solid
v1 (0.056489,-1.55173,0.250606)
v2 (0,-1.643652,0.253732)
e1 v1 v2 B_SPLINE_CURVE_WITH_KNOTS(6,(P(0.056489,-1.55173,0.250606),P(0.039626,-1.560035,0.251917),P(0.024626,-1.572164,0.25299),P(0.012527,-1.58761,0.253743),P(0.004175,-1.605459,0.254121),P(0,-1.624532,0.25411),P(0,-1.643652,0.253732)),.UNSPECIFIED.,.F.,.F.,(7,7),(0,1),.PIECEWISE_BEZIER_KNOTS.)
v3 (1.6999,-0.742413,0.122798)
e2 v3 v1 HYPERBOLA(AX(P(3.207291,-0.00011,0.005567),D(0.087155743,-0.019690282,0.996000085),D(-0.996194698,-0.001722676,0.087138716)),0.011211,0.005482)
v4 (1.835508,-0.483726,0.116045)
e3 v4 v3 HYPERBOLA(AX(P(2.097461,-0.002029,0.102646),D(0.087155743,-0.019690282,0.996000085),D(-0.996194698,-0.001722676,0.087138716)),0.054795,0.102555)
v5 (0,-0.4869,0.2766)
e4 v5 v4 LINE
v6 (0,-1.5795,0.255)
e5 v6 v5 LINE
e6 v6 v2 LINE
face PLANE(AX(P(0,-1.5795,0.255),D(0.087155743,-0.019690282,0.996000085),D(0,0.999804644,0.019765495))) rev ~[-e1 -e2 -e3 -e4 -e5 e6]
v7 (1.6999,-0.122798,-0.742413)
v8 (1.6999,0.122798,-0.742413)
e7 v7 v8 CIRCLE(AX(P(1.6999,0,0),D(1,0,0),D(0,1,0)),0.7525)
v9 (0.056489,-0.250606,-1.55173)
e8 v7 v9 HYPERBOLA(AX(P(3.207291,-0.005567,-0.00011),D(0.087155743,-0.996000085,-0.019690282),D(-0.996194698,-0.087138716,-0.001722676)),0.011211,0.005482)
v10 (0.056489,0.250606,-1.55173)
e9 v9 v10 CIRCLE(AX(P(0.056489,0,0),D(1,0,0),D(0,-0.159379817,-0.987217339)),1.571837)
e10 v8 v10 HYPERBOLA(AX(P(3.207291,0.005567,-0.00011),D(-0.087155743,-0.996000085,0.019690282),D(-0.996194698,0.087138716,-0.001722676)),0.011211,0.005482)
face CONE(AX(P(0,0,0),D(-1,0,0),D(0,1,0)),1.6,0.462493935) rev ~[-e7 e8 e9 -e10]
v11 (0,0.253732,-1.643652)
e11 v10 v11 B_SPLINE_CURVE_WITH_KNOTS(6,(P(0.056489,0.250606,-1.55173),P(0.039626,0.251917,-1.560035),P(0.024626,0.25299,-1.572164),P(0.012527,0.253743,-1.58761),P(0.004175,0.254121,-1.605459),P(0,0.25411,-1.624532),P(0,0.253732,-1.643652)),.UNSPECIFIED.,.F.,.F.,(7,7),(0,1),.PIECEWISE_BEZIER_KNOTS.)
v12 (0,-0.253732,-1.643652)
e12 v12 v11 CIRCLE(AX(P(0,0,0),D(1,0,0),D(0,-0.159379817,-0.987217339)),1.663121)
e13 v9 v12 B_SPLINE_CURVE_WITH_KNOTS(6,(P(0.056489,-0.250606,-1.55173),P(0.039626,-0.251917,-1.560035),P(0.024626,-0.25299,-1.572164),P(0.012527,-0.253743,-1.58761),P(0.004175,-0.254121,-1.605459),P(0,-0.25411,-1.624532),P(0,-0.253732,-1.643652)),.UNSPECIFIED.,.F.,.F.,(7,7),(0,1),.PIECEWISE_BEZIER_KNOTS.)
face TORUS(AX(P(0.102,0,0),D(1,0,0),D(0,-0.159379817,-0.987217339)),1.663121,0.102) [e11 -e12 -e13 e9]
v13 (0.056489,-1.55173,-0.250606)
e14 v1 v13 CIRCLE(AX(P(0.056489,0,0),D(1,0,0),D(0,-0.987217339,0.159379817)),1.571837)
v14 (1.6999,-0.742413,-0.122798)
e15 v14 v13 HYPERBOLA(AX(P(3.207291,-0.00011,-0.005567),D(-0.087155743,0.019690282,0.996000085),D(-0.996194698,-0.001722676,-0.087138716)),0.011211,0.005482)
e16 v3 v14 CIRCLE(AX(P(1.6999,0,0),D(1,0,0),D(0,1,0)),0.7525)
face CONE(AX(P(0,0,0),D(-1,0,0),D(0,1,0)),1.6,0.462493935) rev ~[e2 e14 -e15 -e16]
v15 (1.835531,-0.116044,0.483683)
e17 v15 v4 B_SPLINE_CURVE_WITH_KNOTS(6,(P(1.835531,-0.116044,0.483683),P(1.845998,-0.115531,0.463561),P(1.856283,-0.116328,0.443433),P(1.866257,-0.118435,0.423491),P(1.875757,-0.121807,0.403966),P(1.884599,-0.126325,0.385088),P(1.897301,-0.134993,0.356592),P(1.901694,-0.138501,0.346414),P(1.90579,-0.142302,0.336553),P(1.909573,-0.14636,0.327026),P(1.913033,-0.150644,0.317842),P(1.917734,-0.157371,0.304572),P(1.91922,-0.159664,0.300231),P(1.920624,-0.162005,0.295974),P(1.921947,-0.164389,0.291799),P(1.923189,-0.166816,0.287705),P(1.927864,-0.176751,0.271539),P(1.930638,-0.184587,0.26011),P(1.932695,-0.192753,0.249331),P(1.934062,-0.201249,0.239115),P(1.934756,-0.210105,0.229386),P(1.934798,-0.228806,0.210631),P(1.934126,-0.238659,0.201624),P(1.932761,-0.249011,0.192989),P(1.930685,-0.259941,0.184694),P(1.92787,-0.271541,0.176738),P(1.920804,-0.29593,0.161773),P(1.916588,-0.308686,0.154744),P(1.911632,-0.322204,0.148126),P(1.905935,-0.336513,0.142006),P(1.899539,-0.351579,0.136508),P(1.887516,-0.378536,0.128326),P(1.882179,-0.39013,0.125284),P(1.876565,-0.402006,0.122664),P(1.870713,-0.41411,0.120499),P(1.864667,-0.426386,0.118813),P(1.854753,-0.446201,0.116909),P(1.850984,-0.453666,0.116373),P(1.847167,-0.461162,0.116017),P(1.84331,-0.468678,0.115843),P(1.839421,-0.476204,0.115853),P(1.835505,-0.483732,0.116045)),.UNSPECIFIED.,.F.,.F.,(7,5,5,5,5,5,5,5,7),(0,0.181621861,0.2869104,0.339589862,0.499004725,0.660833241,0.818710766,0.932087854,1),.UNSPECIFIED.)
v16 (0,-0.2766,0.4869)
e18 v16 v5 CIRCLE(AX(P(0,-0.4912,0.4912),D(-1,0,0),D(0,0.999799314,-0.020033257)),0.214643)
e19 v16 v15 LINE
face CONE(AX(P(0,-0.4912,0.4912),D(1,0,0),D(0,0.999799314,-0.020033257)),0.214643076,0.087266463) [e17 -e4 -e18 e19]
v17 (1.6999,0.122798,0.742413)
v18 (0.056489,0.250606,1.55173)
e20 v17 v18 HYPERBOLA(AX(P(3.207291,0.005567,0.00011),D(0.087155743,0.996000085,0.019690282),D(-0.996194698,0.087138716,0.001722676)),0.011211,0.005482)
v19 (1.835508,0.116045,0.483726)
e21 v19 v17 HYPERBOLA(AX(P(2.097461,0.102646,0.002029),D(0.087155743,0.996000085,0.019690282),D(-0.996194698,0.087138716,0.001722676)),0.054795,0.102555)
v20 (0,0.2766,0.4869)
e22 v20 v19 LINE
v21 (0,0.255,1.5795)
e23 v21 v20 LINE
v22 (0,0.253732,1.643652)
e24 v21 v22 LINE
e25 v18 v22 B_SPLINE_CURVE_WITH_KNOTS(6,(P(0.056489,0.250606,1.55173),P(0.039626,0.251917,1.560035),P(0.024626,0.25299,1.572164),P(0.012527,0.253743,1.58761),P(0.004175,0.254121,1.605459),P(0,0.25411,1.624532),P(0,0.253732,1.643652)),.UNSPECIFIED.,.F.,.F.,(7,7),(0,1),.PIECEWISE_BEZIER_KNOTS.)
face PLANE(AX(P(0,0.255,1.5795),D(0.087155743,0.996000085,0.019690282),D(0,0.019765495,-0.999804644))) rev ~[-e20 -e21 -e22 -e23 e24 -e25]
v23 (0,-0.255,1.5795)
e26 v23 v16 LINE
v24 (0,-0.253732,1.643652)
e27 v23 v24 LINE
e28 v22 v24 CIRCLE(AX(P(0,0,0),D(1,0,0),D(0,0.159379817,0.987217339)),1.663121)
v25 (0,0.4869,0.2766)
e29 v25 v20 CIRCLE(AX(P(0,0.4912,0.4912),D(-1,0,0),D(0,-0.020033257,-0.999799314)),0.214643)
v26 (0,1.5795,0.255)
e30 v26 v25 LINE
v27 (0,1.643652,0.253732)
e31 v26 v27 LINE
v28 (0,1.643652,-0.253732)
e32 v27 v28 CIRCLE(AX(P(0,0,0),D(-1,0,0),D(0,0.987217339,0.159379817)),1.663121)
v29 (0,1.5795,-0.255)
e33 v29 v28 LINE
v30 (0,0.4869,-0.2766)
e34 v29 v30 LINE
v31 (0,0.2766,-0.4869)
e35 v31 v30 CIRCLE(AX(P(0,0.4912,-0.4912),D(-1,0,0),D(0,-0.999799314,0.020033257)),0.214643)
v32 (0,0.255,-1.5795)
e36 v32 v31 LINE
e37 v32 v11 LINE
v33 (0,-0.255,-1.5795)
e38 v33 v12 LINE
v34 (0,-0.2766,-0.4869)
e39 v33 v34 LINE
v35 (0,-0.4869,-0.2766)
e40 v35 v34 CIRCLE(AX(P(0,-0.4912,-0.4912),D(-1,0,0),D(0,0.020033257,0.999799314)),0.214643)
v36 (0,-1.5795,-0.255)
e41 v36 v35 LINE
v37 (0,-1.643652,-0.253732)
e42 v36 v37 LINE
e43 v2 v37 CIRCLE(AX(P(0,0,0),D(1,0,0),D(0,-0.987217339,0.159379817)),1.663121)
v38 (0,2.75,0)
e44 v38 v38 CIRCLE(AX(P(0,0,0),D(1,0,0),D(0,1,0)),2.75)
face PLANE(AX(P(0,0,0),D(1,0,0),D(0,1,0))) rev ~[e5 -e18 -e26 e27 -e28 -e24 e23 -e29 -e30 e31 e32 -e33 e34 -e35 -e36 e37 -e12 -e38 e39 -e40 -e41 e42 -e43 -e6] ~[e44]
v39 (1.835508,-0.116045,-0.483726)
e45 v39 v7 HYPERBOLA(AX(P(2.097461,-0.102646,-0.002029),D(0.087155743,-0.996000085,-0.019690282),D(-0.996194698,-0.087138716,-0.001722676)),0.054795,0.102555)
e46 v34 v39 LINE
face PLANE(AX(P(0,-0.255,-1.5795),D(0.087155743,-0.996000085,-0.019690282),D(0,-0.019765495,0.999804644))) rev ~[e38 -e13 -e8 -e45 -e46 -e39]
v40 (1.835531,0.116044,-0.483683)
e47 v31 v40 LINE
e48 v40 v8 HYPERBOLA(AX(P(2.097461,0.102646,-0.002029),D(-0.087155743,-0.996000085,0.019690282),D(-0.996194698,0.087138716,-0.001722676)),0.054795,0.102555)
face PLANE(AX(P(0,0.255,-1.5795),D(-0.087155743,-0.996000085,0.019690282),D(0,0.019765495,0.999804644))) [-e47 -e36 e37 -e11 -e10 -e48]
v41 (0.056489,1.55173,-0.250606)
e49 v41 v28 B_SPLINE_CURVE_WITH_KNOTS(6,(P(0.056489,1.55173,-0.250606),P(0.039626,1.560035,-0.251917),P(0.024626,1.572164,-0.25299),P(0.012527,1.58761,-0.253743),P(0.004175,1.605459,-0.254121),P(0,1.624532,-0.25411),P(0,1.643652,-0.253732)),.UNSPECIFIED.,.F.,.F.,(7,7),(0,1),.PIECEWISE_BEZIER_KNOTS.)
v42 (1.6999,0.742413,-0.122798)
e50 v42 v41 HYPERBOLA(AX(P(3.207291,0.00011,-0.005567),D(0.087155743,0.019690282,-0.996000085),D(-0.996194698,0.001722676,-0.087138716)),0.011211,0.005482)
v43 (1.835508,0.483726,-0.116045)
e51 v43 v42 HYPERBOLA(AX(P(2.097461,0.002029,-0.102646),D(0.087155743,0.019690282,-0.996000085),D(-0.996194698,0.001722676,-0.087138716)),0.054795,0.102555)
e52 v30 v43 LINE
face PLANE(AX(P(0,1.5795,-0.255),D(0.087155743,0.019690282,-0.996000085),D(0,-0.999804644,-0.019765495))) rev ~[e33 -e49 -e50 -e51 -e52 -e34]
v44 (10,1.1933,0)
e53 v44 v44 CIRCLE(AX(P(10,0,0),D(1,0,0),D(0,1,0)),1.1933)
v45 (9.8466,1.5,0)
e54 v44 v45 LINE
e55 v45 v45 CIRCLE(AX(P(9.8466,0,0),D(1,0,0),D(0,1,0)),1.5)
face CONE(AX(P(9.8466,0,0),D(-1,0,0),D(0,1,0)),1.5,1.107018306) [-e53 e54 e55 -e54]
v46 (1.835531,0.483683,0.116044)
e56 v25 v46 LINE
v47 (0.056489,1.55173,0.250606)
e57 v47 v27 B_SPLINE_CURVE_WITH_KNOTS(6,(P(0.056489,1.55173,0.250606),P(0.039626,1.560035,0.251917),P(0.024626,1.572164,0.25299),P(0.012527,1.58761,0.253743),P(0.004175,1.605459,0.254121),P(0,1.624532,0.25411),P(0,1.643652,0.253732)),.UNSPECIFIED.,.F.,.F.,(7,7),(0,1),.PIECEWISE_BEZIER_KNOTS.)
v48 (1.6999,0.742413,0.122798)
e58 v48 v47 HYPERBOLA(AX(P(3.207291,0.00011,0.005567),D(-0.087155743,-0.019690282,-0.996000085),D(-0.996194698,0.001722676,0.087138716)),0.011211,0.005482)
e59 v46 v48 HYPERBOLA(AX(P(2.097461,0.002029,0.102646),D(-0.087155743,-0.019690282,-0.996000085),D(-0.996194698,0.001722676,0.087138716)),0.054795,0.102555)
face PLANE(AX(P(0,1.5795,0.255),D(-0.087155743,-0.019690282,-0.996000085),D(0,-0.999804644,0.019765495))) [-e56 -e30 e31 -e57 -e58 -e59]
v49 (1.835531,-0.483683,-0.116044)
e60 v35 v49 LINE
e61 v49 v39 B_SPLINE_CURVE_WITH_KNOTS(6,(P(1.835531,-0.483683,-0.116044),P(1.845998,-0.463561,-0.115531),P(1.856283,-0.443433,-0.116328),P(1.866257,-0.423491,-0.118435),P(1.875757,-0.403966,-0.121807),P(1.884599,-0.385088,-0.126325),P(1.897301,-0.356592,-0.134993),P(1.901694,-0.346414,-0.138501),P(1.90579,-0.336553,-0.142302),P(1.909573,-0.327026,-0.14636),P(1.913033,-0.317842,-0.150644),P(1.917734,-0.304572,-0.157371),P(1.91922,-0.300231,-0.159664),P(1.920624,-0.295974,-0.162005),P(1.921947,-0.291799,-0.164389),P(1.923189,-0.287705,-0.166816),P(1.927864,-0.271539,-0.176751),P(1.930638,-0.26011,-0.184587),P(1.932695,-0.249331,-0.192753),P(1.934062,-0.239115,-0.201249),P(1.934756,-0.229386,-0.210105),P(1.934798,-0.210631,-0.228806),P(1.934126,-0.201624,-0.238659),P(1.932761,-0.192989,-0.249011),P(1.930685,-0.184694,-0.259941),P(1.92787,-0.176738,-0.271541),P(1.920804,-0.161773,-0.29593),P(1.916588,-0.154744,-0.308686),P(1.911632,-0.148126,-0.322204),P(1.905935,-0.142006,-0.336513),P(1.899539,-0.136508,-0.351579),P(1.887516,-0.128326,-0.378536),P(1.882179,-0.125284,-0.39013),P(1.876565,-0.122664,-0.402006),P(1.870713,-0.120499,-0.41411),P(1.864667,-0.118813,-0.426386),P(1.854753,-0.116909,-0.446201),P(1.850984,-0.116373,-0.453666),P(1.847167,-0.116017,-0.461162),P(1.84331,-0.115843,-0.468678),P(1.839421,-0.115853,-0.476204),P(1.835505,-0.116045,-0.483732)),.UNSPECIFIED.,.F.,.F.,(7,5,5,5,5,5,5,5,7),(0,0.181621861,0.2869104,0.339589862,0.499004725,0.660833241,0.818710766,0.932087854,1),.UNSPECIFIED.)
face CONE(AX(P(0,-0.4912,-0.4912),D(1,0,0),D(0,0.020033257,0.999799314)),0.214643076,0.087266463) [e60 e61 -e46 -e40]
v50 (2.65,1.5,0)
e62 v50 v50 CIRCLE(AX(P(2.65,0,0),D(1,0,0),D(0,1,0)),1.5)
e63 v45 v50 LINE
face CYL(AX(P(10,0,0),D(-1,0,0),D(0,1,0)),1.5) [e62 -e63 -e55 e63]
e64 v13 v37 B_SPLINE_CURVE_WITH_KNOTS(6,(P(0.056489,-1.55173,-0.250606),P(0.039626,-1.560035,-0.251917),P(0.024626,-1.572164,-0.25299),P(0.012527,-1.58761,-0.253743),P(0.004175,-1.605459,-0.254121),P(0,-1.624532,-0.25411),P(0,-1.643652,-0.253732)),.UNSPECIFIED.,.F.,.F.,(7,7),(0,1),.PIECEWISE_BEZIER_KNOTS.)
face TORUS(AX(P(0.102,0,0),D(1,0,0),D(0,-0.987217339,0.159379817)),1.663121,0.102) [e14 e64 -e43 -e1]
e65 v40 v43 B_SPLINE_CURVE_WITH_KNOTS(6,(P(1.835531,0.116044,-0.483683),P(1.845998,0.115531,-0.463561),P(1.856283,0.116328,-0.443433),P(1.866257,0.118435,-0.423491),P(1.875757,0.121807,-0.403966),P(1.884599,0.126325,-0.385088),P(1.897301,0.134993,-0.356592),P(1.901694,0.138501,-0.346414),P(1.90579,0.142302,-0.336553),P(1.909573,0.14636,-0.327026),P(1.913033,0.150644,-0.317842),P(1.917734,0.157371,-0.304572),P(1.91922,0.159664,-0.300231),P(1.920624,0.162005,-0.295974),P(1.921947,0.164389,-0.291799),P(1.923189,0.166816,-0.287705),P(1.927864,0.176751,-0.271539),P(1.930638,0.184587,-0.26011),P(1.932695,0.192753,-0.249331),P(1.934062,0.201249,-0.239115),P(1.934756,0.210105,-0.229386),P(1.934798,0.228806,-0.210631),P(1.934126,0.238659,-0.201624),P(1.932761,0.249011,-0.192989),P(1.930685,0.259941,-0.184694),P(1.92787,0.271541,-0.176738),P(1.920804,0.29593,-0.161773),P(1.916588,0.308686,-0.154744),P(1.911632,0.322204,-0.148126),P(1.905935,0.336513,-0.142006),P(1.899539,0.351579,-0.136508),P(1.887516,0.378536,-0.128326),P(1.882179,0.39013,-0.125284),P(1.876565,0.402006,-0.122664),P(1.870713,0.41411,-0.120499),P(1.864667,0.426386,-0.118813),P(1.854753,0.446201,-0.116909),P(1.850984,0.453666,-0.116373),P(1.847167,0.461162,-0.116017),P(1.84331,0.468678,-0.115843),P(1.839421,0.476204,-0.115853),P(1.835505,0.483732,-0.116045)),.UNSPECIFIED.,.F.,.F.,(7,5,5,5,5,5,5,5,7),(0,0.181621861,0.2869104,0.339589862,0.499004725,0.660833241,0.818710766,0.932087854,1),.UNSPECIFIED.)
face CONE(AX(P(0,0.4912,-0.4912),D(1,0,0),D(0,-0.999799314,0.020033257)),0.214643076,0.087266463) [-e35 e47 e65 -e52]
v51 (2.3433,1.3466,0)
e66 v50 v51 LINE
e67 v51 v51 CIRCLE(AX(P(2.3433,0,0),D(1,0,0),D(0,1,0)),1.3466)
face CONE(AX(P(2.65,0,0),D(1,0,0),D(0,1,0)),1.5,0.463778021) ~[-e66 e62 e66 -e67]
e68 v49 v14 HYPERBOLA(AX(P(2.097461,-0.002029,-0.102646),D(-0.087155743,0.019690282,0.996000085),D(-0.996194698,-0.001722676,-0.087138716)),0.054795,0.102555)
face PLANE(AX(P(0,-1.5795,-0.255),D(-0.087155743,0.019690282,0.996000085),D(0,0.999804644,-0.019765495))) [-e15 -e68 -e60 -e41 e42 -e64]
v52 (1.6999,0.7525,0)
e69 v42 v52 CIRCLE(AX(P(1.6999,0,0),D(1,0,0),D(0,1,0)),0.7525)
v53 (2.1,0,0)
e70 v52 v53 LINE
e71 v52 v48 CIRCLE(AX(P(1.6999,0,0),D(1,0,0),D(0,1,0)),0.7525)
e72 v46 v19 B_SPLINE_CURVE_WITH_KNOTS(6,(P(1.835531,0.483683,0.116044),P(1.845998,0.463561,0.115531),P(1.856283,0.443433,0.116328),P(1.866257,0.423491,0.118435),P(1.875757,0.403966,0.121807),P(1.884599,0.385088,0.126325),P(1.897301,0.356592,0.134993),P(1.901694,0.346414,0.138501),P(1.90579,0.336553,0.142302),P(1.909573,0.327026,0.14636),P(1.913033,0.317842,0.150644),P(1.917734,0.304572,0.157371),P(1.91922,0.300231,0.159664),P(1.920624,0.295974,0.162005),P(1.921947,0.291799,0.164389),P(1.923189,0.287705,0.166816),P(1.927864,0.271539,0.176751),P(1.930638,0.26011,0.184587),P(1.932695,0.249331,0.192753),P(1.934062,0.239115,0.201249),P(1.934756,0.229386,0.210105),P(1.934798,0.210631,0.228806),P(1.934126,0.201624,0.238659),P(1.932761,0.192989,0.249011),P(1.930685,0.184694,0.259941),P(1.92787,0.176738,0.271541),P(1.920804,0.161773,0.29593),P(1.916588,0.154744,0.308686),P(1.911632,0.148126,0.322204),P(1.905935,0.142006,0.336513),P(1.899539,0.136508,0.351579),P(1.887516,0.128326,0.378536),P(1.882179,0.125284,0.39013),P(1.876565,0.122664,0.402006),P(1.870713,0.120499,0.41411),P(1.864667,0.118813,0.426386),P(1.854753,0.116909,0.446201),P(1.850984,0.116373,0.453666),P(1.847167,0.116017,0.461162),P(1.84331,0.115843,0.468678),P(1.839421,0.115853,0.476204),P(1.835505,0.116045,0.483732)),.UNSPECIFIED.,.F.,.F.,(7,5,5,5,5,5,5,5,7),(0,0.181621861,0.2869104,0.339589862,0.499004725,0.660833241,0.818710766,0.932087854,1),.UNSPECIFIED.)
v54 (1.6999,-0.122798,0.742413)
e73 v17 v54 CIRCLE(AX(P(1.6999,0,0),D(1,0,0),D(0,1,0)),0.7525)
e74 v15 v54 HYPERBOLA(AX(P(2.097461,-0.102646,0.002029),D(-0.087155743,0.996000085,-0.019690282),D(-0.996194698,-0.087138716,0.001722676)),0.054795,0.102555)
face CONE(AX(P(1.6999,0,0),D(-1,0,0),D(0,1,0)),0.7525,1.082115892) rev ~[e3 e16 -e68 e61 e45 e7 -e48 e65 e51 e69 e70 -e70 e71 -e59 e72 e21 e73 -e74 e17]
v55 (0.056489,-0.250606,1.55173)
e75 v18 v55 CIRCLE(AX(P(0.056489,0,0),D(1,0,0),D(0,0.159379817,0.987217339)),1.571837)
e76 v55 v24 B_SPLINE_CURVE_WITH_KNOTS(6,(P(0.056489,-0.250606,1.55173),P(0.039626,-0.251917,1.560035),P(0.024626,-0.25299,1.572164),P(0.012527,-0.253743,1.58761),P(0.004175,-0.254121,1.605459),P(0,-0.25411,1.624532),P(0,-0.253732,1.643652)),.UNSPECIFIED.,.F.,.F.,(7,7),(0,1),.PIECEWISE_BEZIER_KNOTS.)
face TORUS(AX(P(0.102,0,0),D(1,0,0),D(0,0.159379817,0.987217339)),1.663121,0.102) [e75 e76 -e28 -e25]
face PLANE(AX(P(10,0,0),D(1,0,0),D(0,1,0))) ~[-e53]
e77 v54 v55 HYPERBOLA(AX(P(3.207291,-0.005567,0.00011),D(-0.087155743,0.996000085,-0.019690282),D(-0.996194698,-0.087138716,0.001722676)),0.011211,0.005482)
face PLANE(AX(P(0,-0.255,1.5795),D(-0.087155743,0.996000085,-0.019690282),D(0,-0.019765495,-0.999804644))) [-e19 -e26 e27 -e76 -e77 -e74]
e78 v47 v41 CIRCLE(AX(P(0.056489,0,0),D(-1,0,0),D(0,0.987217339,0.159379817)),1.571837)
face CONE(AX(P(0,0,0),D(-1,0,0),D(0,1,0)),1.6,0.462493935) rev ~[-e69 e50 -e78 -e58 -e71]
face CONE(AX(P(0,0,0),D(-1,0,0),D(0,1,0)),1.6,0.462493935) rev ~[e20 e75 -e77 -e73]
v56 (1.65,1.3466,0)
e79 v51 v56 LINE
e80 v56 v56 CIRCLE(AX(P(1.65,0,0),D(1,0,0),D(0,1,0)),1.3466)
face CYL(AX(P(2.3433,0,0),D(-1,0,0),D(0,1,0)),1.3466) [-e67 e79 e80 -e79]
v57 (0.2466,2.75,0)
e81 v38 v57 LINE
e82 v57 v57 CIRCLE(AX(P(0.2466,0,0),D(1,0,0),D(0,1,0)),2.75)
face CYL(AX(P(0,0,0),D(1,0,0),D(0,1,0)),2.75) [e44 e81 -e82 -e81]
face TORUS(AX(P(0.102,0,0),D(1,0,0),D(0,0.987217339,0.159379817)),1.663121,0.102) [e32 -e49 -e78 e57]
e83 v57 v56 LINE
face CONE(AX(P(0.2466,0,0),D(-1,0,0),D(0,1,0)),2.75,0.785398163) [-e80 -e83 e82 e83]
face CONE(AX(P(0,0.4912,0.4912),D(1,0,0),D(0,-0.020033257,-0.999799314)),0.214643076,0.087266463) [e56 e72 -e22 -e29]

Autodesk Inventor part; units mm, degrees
ref_plane "YZ Plane" through (0, 0, 0) normal (1, 0, 0) x (0, 1, 0)
ref_plane "XZ Plane" through (0, 0, 0) normal (0, 1, 0) x (-1, 0, 0)
sketch "Szkic1" plane through (0, 0, 0) normal (0, 0, 1) x (1, 0, 0)
  line L0 (2.1, 0) -> (10, 0)
  line L1 (10, 0) -> (10, 1.5)
  line L2 (10, 1.5) -> (2.65, 1.5)
  line L3 (2.65, 1.5) -> (2.3433, 1.3466)
  line L4 (2.3433, 1.3466) -> (1.65, 1.3466)
  line L5 (0, 2.75) -> (0, 1.6)
  line L6 (0, 1.6) -> (1.6999, 0.7525)
  line L7 (1.6999, 0.7525) -> (2.1, 0)
  line L8 (-2, 0) -> (12, 0) projected
  line L9 (0, -0.55) -> (0, 3.3) projected
  line L10 (0, 2.75) -> (0.2466, 2.75)
  line L11 (0.2466, 2.75) -> (1.65, 1.3466)
  line L12 (2.65, 1.5) -> (1.4966, 1.5) construction
  dimension "d1" = 7.35
  dimension "d2" = 3
  dimension "d3" = 2.6933
  dimension "d4" = 3.2
  dimension "d5" = 26.5
  dimension "d6" = 62
  dimension "d7" = 2.1
  dimension "d8" = 0.3067
  dimension "d12" = 5.5
  dimension "d13" = 45
  dimension "d15" = 10
  dimension "d24" = 1.65
revolve "Bryła" add sketch "Szkic1" angle 360 about axis through (2.1, 0, 0) along (1, 0, 0) contours L7 L6 L5 L10 L11 L4 L3 L2 L1 L0
sketch "Szkic2" plane through (0, 0, 0) normal (-1, 0, 0) x (0, 0, 1)
  line L0 (0, 1.6) -> (0, 0) construction
  line L1 (0, 0) -> (1.6, 0) construction
  arc A0 (0.48, 0) -> (0, 0.48) centre (0, 0) ccw construction
  arc A1 (0.56, 0) -> (0, 0.56) centre (0, 0) ccw construction
  arc A2 (1.5795, 0.255) -> (0.255, 1.5795) centre (0, 0) ccw
  line L2 (0, 0) -> (1.1314, 1.1314) construction
  line L3 (0.255, 1.5795) -> (0.2766, 0.4869)
  line L4 (1.5795, 0.255) -> (0.4869, 0.2766)
  arc A3 (0.255, 1.5795) -> (0, 1.6) centre (0, 0) ccw
  arc A4 (1.6, 0) -> (1.5795, 0.255) centre (0, 0) ccw
  line L5 (0, -3.85) -> (0, 3.85) projected
  line L6 (-3.85, 0) -> (3.85, 0) projected
  arc A5 (0.255, -1.5795) -> (1.5795, -0.255) centre (0, 0) ccw
  line L7 (0.255, -1.5795) -> (0.2766, -0.4869)
  line L8 (1.5795, -0.255) -> (0.4869, -0.2766)
  arc A6 (0, -1.6) -> (0.255, -1.5795) centre (0, 0) ccw
  arc A7 (1.5795, -0.255) -> (1.6, 0) centre (0, 0) ccw
  arc A8 (-0.255, 1.5795) -> (-1.5795, 0.255) centre (0, 0) ccw
  line L9 (-0.255, 1.5795) -> (-0.2766, 0.4869)
  line L10 (-1.5795, 0.255) -> (-0.4869, 0.2766)
  arc A9 (0, 1.6) -> (-0.255, 1.5795) centre (0, 0) ccw
  arc A10 (-1.5795, 0.255) -> (-1.6, 0) centre (0, 0) ccw
  arc A11 (-0.255, -1.5795) -> (0, -1.6) centre (0, 0) ccw
  arc A12 (-1.5795, -0.255) -> (-0.255, -1.5795) centre (0, 0) ccw
  arc A13 (-1.6, 0) -> (-1.5795, -0.255) centre (0, 0) ccw
  line L11 (-1.5795, -0.255) -> (-0.4869, -0.2766)
  line L12 (-0.255, -1.5795) -> (-0.2766, -0.4869)
  arc A14 (0.2766, 0.4869) -> (0.4869, 0.2766) centre (0.4912, 0.4912) ccw
  arc A15 (0.4869, -0.2766) -> (0.2766, -0.4869) centre (0.4912, -0.4912) ccw
  arc A16 (-0.4869, 0.2766) -> (-0.2766, 0.4869) centre (-0.4912, 0.4912) ccw
  arc A17 (-0.2766, -0.4869) -> (-0.4869, -0.2766) centre (-0.4912, -0.4912) ccw
  point P0 (1.1314, -1.1314)
  point P1 (-1.1314, 1.1314)
  point P2 (-1.1314, -1.1314)
  dimension "d17" = 0.96
  dimension "d18" = 1.12
  dimension "d19" = 3.2
  dimension "d20" = 45
  dimension "d21" = 0.255
extrude "Szczelina" add sketch "Szkic2" against normal up to next draft 5 contours L4 A14 L3 A2 | A5 L7 A15 L8 | L9 A16 L10 A8 | A12 L11 A17 L12
fillet "Zaokrąglenie1" radius 0.102 4 edges at (0, 1.6, 0) (0, 0, -1.6) (0, -1.6, 0) (0, 0, 1.6)
thread "Gwint" size "M3x0.5" class "6g" standard "ISO Metric profile" length 7.35
chamfer "Faza1" distance 0.3067 distance2 0.1534 1 edges at (10, -1.5, 0) measured on face at (10, -0.5112, 0.3316)
ref_plane "Work Plane2" through (3.35, 0, 0) normal (0, 0, -1) x (1, 0, 0)
equation "\"d1\" = GEL"
equation "\"d2\" = GD"
equation "\"d3\" = BDM"
equation "\"d4\" = SDM"
equation "\"d7\" = INTI"
equation "\"d8\" = GAL"
equation "\"d12\" = KOD"
equation "\"d13\" = 0.5 * SEWI"
equation "\"d15\" = NLG"
equation "\"d24\" = KOH"
equation "\"d17\" = 0.3 * SDM"
equation "\"d18\" = 0.35 * SDM"
equation "\"d19\" = SDM"
equation "\"d21\" = 0.5 * SBR"
equation "\"d23\" = 0.2 * SBR"
equation "\"d10\" = GEL"
equation "\"d25\" = -0.5 * SPD + 0.5 * GD"
equation "\"d26\" = 0.5 * GAL"
equation "\"NLG\" = 10"
equation "\"GEL\" = 7.35"
equation "\"GAL\" = 0.61345 * PTC"
equation "\"SPD\" = NND - 1.2269 * PTC"
equation "\"KOD\" = 5.5"
equation "\"KOH\" = 1.65"
equation "\"SBR\" = 0.51"
equation "\"INTI\" = 2.1"
equation "\"SDM\" = 3.2"
equation "\"GD\" = NND"
equation "\"BDM\" = NND - GAL"
equation "\"SEWI\" = 90deg"
equation "\"d9\" = SDM"
equation "\"GUL\" = 0.61345 * PTC"
equation "\"TOA\" = 30deg"
equation "\"EPV\" = 3.15"
equation "\"THREADDIA\" = 3"
equation "\"PTC\" = 0.5"
equation "\"NND\" = 3"
equation "\"GD1\" = THREADDIA - 1.2269 * PTC"
properties part number "ISO 7046-1 - M3 x 10 - 4.8 - H" material "Stal"
